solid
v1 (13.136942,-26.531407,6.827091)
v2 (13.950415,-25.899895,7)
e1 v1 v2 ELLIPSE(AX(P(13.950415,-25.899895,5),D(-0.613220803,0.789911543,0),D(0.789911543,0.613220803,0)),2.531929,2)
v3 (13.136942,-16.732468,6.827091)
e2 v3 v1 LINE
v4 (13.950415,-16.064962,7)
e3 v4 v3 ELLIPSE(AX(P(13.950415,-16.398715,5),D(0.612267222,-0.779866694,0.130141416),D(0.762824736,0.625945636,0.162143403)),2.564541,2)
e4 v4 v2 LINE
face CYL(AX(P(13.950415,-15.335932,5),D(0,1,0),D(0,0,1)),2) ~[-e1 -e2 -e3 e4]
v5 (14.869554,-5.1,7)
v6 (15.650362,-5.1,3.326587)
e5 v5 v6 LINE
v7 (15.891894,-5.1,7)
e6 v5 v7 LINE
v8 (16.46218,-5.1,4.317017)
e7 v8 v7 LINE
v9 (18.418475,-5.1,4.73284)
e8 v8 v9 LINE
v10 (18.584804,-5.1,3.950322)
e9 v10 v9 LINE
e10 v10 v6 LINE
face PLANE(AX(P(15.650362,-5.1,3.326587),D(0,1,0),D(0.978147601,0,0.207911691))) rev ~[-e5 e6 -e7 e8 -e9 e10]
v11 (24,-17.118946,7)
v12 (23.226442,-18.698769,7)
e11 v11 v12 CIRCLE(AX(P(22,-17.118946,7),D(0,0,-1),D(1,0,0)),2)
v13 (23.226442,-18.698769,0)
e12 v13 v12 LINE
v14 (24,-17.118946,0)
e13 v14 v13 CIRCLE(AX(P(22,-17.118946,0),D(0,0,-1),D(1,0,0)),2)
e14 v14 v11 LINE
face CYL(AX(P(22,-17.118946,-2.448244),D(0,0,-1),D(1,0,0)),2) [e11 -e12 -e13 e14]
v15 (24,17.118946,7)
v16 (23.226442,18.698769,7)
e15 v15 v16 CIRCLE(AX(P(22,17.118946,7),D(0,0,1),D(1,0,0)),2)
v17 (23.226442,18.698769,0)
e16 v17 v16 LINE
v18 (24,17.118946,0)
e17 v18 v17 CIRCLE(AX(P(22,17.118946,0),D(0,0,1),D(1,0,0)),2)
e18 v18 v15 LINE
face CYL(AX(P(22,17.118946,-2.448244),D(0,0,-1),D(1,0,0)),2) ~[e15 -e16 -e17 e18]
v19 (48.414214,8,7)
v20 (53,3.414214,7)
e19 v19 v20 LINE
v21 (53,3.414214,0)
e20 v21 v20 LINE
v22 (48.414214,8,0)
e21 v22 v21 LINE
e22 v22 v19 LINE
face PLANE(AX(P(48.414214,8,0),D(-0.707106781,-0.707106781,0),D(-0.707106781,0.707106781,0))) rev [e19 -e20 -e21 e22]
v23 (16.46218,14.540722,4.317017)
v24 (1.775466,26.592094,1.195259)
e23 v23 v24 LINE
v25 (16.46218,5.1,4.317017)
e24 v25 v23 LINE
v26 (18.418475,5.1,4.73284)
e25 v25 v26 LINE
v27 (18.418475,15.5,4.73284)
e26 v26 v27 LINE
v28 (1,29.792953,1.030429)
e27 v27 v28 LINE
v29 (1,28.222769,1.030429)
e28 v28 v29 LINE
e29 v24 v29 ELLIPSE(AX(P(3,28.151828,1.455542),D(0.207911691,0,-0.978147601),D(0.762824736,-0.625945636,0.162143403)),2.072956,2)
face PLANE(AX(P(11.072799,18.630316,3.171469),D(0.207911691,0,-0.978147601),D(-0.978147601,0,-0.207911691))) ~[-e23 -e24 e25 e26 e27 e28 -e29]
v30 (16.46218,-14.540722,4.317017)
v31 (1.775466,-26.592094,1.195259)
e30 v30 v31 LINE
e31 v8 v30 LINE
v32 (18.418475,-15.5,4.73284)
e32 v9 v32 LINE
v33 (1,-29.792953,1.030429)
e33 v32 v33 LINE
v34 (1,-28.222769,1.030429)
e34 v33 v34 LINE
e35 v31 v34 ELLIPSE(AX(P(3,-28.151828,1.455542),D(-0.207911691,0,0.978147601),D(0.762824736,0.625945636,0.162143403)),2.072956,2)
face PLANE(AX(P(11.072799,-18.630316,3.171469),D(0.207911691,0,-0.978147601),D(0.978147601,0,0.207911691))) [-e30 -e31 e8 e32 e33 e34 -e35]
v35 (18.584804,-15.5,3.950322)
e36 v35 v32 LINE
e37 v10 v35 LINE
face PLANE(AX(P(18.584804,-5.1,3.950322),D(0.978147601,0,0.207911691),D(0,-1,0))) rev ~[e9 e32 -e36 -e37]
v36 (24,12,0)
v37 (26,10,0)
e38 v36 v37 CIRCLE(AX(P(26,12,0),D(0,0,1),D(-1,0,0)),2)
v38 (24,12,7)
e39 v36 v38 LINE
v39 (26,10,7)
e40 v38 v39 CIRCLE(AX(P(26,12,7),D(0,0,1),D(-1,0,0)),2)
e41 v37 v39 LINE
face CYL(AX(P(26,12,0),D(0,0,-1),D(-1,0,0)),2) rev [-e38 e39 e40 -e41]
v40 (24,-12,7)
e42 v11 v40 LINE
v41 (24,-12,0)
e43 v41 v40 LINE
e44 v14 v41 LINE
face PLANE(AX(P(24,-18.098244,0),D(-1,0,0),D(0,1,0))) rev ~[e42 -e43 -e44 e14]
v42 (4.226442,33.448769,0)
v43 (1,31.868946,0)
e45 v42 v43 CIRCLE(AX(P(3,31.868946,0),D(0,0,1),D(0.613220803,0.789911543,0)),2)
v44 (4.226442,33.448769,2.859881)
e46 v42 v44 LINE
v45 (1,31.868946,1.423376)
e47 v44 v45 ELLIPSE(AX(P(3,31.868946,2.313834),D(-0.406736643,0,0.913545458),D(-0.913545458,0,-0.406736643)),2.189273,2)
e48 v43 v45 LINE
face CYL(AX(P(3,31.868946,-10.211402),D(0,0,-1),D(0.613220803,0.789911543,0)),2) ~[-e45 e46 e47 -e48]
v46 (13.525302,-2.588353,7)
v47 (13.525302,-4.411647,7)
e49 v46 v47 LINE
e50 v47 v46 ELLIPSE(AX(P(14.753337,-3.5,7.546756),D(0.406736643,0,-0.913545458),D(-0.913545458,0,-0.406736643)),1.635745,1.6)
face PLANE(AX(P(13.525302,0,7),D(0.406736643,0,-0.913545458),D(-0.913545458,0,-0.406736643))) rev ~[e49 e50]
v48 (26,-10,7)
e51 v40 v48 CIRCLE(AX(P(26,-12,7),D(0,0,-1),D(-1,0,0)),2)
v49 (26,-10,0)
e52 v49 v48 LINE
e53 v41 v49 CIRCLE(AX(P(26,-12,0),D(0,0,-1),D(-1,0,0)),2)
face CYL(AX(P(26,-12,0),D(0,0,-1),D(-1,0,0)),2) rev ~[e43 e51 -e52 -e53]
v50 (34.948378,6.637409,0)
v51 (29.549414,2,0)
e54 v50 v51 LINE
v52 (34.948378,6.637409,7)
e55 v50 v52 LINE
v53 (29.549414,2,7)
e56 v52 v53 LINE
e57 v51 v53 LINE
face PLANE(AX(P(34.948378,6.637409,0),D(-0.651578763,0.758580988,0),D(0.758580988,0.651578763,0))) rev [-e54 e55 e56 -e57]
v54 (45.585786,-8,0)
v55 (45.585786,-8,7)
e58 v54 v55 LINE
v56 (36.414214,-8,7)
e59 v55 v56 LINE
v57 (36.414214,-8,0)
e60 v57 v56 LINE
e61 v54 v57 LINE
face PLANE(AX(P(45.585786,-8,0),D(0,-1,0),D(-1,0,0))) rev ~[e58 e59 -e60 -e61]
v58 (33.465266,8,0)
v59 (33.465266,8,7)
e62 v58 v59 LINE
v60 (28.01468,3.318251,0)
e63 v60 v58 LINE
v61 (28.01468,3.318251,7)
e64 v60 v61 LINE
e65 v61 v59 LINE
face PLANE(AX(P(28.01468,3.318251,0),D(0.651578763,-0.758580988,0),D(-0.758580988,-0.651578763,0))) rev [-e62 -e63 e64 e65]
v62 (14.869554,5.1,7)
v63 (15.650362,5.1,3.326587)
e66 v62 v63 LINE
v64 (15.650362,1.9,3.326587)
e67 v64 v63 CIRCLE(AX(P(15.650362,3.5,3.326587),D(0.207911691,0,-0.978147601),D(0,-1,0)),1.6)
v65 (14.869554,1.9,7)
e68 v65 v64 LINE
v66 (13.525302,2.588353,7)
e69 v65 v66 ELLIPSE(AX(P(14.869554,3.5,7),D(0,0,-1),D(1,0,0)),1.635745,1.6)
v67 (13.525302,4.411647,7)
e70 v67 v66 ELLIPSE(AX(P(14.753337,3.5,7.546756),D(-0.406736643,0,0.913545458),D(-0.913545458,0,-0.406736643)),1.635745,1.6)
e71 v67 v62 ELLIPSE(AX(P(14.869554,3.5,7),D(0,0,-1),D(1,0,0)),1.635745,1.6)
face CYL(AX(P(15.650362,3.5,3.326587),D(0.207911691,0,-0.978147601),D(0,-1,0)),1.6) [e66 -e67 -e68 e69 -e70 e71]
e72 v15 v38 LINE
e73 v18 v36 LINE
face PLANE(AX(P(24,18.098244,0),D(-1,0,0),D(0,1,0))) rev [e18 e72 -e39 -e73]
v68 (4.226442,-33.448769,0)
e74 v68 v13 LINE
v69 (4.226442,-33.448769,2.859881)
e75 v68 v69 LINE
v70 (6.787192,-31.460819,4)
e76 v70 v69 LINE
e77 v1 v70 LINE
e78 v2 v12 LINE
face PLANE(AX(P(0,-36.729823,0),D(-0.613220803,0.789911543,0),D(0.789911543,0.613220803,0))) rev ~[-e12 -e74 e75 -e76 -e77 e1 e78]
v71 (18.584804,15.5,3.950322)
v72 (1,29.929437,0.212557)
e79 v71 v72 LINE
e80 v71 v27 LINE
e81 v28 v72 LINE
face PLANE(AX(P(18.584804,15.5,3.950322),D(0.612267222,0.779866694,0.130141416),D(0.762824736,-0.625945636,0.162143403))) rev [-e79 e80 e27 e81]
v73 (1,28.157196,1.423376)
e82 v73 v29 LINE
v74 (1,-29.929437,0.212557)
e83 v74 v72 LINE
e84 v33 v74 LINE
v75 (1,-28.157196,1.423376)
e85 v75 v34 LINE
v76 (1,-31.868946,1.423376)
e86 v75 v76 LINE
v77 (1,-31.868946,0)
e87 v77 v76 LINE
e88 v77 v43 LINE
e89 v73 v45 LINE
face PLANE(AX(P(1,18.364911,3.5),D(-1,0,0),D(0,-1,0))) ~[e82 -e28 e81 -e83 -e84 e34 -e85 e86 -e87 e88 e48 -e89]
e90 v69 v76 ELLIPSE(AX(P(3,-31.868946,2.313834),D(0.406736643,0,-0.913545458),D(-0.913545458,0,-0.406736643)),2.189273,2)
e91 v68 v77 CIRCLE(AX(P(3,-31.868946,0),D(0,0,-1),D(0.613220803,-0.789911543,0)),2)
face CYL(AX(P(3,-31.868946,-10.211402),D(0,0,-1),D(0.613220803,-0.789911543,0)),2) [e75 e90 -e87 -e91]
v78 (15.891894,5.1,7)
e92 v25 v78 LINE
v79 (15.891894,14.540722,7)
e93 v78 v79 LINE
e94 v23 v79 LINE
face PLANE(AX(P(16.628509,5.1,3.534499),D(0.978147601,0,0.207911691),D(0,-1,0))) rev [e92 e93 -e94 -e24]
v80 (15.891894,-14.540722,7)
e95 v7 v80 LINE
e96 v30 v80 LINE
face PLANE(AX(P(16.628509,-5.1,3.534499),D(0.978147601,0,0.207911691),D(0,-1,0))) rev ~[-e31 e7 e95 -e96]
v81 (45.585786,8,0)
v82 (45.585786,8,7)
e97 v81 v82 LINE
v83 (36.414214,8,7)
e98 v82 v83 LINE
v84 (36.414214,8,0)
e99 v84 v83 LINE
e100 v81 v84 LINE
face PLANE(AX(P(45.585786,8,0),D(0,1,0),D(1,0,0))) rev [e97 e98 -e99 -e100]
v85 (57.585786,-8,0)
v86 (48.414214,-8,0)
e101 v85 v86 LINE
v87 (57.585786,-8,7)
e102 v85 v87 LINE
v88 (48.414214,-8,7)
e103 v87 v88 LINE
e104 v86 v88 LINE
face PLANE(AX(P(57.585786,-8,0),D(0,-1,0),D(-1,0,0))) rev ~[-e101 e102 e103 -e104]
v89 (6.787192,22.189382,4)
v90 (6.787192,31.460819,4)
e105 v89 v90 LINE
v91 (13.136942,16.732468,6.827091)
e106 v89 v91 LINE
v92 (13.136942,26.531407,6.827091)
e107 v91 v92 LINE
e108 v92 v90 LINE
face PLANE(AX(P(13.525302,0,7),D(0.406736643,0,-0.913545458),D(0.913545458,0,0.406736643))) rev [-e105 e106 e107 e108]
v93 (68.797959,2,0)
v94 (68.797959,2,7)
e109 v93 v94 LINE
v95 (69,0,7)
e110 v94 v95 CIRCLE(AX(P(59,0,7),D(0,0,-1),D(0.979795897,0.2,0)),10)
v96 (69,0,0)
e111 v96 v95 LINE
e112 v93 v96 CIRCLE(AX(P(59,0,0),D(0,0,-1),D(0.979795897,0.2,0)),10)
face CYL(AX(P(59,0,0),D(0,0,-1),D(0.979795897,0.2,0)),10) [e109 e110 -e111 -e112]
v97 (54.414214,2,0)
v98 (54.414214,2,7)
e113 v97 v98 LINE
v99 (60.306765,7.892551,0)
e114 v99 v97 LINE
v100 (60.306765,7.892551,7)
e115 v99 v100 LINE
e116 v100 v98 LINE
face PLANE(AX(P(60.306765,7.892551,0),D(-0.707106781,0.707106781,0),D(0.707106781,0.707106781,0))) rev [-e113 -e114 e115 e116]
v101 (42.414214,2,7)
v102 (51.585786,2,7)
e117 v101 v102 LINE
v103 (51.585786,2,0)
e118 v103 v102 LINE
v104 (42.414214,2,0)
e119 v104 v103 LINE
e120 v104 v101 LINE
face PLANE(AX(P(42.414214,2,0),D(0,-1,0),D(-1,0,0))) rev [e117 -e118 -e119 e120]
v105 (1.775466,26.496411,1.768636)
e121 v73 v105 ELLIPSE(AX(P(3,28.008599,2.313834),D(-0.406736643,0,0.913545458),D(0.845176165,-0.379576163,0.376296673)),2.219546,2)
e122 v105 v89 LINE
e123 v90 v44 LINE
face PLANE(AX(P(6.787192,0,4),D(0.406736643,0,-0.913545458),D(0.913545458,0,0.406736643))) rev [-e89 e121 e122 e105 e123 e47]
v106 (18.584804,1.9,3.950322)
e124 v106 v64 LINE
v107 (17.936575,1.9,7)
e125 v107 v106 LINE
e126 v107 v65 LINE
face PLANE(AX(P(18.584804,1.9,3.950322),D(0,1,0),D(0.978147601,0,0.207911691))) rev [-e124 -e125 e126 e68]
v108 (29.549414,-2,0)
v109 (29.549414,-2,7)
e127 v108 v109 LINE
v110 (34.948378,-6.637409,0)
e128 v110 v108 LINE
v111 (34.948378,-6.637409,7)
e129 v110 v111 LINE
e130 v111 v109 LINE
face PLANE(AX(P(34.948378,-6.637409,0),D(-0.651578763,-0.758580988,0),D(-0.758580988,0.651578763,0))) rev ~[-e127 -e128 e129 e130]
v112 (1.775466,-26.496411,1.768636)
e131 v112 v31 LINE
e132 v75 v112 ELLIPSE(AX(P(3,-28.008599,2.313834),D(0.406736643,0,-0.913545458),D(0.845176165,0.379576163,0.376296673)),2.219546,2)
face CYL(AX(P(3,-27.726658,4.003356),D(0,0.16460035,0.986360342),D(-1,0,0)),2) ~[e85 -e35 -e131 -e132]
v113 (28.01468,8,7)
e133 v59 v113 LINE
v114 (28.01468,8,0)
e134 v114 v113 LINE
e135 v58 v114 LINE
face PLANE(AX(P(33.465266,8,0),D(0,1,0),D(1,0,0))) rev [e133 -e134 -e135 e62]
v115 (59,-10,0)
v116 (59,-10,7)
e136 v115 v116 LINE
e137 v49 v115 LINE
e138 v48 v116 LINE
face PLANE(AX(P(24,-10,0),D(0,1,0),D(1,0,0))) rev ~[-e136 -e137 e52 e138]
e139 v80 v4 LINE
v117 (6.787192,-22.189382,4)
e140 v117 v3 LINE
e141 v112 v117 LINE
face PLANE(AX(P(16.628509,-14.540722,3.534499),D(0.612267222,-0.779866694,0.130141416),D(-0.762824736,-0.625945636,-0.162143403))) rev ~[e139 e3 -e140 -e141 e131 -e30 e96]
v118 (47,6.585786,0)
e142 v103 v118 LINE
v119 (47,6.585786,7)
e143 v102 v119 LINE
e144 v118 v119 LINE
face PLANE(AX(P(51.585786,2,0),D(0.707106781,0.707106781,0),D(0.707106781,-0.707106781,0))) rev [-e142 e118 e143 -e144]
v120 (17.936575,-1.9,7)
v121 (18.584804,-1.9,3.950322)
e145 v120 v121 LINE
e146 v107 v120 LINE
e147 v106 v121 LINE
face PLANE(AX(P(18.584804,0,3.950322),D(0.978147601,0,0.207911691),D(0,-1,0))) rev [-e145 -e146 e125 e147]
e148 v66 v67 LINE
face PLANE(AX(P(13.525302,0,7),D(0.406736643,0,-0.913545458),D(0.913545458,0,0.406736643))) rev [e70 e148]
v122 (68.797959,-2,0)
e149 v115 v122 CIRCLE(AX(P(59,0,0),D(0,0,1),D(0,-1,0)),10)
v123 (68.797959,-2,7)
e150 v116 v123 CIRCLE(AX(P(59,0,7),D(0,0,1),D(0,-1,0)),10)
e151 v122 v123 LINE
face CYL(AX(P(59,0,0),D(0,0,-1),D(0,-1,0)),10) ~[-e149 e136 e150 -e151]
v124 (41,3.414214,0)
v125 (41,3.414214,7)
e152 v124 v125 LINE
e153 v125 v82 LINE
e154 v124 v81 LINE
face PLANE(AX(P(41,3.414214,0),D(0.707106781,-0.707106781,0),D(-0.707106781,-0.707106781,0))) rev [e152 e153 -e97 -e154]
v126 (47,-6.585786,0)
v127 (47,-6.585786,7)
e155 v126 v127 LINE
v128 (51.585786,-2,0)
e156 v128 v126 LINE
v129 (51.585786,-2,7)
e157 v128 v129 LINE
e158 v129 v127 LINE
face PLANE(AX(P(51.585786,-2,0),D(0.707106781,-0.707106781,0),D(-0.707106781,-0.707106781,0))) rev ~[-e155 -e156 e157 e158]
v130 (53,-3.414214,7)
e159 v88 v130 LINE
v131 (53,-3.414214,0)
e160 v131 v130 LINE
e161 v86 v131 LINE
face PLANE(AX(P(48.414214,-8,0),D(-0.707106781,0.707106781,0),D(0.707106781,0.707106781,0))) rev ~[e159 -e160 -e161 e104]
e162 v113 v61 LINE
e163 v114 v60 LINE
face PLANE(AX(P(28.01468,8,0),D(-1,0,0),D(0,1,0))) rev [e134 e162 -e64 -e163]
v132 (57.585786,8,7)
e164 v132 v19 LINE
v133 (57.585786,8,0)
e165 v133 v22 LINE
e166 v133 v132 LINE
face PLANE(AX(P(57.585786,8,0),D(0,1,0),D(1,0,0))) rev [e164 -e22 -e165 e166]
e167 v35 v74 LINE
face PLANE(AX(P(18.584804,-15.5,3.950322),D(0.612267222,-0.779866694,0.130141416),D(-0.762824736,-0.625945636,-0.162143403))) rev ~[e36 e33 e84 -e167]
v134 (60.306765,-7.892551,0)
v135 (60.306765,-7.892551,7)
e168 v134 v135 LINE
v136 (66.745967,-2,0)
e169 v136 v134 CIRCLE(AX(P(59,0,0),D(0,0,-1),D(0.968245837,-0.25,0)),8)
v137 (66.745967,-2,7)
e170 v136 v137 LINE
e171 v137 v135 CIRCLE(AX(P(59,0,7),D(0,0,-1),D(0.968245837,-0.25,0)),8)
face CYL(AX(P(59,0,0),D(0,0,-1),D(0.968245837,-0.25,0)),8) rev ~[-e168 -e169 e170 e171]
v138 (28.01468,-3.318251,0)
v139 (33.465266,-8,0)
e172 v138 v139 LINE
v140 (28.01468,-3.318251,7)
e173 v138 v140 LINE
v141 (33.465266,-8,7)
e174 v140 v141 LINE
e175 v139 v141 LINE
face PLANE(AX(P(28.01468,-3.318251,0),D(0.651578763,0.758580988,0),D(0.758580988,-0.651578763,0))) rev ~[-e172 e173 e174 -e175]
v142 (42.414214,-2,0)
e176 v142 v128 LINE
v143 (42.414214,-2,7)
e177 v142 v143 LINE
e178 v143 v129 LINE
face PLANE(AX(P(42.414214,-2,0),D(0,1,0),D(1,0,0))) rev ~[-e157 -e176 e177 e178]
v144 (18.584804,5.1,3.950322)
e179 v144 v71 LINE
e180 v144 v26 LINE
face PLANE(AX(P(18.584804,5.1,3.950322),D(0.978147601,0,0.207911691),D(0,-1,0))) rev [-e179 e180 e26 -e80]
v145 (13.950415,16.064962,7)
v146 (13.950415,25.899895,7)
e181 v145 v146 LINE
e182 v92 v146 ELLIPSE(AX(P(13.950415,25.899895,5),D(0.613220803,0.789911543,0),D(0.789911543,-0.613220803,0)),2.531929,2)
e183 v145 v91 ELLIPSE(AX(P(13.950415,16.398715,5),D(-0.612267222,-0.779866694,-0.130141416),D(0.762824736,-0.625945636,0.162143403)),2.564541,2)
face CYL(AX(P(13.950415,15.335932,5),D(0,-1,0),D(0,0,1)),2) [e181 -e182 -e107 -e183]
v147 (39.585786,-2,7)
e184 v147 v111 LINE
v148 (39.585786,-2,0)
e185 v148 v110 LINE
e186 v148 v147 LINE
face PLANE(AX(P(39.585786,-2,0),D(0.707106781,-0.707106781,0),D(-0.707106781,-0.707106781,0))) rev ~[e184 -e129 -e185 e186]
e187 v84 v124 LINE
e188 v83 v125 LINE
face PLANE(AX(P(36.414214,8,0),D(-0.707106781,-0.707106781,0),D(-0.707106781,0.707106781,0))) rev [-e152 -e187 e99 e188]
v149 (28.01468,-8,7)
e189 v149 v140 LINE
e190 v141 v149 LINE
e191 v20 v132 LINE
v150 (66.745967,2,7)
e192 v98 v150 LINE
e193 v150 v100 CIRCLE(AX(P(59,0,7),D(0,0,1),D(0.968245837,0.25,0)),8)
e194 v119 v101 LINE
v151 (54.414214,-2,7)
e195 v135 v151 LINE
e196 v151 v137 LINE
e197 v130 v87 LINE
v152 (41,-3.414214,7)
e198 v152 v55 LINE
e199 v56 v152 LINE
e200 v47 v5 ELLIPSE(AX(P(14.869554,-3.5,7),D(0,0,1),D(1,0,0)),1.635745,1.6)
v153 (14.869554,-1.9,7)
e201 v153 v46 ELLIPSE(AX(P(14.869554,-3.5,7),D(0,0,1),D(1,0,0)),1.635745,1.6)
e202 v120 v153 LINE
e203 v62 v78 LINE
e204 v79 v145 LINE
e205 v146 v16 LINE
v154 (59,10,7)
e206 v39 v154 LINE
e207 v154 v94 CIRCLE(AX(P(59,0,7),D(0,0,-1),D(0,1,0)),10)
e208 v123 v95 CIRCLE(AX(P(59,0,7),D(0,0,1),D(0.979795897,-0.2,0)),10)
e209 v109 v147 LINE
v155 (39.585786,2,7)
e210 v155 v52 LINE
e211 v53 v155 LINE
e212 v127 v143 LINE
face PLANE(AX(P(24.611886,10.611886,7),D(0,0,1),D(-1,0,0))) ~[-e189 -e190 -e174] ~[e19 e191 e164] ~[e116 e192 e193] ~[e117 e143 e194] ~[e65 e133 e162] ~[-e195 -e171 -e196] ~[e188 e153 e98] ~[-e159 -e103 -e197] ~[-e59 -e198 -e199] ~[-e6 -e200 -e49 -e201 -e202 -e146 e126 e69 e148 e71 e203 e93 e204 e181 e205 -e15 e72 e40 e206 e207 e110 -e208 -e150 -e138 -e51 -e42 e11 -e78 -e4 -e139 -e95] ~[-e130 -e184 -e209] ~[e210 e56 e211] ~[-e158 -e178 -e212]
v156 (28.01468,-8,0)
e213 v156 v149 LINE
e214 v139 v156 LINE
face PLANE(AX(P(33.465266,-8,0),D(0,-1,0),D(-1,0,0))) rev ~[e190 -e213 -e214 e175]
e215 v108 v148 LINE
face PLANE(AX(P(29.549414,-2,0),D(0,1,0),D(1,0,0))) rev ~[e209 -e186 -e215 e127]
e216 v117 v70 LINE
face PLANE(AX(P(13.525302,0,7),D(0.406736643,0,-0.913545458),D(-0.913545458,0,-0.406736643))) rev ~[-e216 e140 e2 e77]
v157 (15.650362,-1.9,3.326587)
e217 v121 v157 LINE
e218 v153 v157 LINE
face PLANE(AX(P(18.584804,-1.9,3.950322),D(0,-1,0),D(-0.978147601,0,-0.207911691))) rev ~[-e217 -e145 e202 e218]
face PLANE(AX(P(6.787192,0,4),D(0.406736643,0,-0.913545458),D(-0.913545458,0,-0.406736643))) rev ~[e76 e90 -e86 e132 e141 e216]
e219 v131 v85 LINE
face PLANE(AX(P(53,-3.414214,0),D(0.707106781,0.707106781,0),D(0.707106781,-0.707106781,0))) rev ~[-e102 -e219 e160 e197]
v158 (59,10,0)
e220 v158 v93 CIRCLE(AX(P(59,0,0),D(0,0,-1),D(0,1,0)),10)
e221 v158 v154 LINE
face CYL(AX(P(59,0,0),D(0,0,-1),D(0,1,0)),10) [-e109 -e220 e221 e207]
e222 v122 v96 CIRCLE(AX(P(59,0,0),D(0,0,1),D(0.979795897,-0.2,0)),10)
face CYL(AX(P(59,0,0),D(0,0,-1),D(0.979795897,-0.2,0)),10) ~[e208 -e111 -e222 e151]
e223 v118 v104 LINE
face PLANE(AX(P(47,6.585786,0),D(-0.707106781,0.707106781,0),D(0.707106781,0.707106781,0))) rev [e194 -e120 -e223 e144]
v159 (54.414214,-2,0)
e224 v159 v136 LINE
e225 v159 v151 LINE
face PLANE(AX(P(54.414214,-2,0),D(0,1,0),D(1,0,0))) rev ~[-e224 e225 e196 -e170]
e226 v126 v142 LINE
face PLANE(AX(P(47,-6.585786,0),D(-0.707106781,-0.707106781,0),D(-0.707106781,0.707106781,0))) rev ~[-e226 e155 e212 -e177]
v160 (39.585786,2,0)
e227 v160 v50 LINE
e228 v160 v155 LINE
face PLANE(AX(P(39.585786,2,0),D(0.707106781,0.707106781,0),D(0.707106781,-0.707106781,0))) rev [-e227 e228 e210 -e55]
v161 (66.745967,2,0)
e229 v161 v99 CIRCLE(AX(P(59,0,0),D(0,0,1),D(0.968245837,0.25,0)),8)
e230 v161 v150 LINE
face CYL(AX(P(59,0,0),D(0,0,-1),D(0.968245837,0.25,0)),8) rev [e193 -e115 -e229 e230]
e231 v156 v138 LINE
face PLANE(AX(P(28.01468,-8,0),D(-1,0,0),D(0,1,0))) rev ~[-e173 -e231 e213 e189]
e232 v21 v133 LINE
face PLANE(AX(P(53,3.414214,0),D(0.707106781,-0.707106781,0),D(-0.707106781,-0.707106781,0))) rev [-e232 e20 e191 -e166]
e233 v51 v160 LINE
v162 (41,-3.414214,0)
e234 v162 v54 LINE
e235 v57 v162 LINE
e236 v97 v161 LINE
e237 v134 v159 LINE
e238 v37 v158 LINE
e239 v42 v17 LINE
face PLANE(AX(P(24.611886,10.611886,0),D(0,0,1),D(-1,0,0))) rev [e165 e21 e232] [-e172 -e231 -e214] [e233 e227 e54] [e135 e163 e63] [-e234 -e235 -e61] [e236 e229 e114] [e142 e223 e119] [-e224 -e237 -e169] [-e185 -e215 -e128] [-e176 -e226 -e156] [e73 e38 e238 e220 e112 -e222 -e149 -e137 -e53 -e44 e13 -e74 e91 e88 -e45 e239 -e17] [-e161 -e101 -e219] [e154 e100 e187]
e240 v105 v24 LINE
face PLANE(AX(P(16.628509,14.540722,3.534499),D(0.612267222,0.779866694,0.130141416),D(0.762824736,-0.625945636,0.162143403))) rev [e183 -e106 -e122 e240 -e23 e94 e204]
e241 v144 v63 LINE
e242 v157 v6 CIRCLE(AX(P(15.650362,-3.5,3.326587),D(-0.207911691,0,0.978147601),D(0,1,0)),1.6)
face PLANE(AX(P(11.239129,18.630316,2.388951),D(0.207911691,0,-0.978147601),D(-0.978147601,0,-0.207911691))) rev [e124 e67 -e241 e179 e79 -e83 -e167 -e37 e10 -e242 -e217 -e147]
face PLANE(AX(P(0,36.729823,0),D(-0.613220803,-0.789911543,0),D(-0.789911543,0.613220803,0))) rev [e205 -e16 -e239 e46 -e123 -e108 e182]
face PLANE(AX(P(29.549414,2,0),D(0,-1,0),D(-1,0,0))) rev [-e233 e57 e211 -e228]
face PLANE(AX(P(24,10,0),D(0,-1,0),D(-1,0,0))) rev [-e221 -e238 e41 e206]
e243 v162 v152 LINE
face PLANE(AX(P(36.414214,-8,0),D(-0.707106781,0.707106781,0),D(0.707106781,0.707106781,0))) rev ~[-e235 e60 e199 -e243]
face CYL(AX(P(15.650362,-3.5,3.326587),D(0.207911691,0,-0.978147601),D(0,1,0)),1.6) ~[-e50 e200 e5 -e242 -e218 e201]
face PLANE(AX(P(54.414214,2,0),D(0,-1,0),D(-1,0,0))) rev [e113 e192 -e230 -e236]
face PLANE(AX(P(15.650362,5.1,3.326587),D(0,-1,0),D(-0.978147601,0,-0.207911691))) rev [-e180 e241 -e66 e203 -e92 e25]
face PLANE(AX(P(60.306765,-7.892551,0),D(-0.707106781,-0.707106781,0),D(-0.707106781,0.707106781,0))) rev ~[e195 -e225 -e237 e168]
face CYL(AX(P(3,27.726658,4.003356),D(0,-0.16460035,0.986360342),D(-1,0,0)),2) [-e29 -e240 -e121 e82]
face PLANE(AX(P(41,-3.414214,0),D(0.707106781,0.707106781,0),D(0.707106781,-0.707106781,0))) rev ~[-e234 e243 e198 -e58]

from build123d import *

# Parameters (mm, degrees)
F1_DEPTH      = 7
F5_DEPTH      = 0.8
F6_REACH      = 40.8395042988
F7_W          = 36.7298226772
F7_H          = 7
F8_DEPTH      = 1
F9_DEPTH      = 45
F10_T1_DEPTH  = 7
F10_T3_DEPTH  = 21.8461795352
F10_T5_DEPTH  = 11.8964874596
F10_T7_DEPTH  = 11.956767541
F10_T12_DEPTH = 5.3023503656


# Not quite as in the source:
# - a fillet or chamfer that OpenCascade refuses, or shapes differently, is made with other operations: its cross-section is extruded or revolved along the edge and cut away or added


with BuildPart() as f1:
    # F0 (on Top) → F1 (new body)
    with BuildSketch(Plane.XY):
        with BuildLine():
            Line((0, 0), (0, -36.7298226772))
            Line((0, -36.7298226772), (24, -18.0982437298))
            Line((24, -18.0982437298), (24, -10))
            Line((24, -10), (59, -10))
            ThreePointArc((59, -10), (65.3245553203, -7.7459666924), (68.7979589711, -2))
            ThreePointArc((68.7979589711, -2), (68.9493615301, -1.0050896201), (69, 0))
            Line((69, 0), (0, 0))
        make_face()
        Polygon((33.4652661258, -8), (28.0146803707, -8), (28.0146803707, -3.3182508079), align=None, mode=Mode.SUBTRACT)
        Polygon((41, -3.4142135624), (45.5857864376, -8), (36.4142135624, -8), align=None, mode=Mode.SUBTRACT)
        Polygon((29.5494142449, -2), (39.5857864376, -2), (34.9483778196, -6.637408618), align=None, mode=Mode.SUBTRACT)
        Polygon((42.4142135624, -2), (51.5857864376, -2), (47, -6.5857864376), align=None, mode=Mode.SUBTRACT)
        Polygon((53, -3.4142135624), (57.5857864376, -8), (48.4142135624, -8), align=None, mode=Mode.SUBTRACT)
        with BuildLine():
            ThreePointArc((66.7459666924, -2), (64.4007894962, -5.9018194498), (60.3067648391, -7.8925512767))
            Line((60.3067648391, -7.8925512767), (54.4142135624, -2))
            Line((54.4142135624, -2), (66.7459666924, -2))
        make_face(mode=Mode.SUBTRACT)
    extrude(amount=F1_DEPTH)

    # F4 (on face) → F5 (cut)
    with BuildSketch(Plane(origin=(0, 0, 0), x_dir=(0.9781476007, 0, 0.2079116908), z_dir=(0.2079116908, 0, -0.9781476007))):
        Polygon((19, 15.5), (0, 30.75), (0, 28.1854591432), (17, 14.5407223011), (17, 5.1), (19, 5.1), align=None)
        with BuildLine():
            Line((17, 14.5407223011), (0, 28.1854591432))
            Line((0, 28.1854591432), (0, 0))
            Line((0, 0), (19, 0))
            Line((19, 0), (19, 1.9))
            Line((19, 1.9), (16, 1.9))
            ThreePointArc((16, 1.9), (14.4, 3.5), (16, 5.1))
            Line((16, 5.1), (17, 5.1))
            Line((17, 5.1), (17, 14.5407223011))
        make_face()
    extrude(amount=-F5_DEPTH, mode=Mode.SUBTRACT)

    f6_end = Plane(origin=(20.8323918984, -11.3984937311, 7), x_dir=(1, 0, 0), z_dir=(0, 0, 1))
    # F4 (on face) → F6 (cut, up to a plane its end follows)
    with BuildSketch(Plane(origin=(0, 0, 0), x_dir=(0.9781476007, 0, 0.2079116908), z_dir=(0.2079116908, 0, -0.9781476007))):
        with BuildLine():
            Line((17, 14.5407223011), (0, 28.1854591432))
            Line((0, 28.1854591432), (0, 0))
            Line((0, 0), (19, 0))
            Line((19, 0), (19, 1.9))
            Line((19, 1.9), (16, 1.9))
            ThreePointArc((16, 1.9), (14.4, 3.5), (16, 5.1))
            Line((16, 5.1), (17, 5.1))
            Line((17, 5.1), (17, 14.5407223011))
        make_face()
    f6_long = extrude(amount=-F6_REACH, mode=Mode.PRIVATE)
    add(split(f6_long, bisect_by=f6_end, keep=Keep.BOTTOM, mode=Mode.PRIVATE), mode=Mode.SUBTRACT)

    # F7 (on face) → F8 (cut)
    with BuildSketch(Plane(origin=(0, 0, 0), x_dir=(0, -1, 0), z_dir=(-1, 0, 0))):
        with Locations((18.3649113386, 3.5)):
            Rectangle(F7_W, F7_H)
    extrude(amount=-F8_DEPTH, mode=Mode.SUBTRACT)

    # F2 (on face) → F9 (cut)
    with BuildSketch(Plane(origin=(0, 0, 0), x_dir=(-1, 0, 0), z_dir=(0, 1, 0))):
        Polygon((0, 4), (-6.7871916141, 4), (0, 0.9781476007), align=None)
        Polygon((-13.5253019358, 7), (-6.7871916141, 4), (0, 4), (0, 7), align=None)
    extrude(amount=-F9_DEPTH, mode=Mode.SUBTRACT)

    # F10: fillet of radius 2 on 5 edges, made by hand

    # F10_s2 → F10_t1 (join)
    with BuildSketch(Plane.XY):
        with BuildLine():
            ThreePointArc((24, -12), (24.5857864376, -10.5857864376), (26, -10))
            Line((26, -10), (24, -10))
            Line((24, -10), (24, -12))
        make_face()
    extrude(amount=F10_T1_DEPTH)

    # F10_s4 → F10_t3 (cut)
    with BuildSketch(Plane.XY.offset(-10.2114016246)):
        with BuildLine():
            ThreePointArc((4.2264416068, -33.4487693246), (2.1204783157, -33.6651760692), (1, -31.8689462379))
            Line((1, -31.8689462379), (1, -35.9535068877))
            Line((1, -35.9535068877), (4.2264416068, -33.4487693246))
        make_face()
    extrude(amount=F10_T3_DEPTH, mode=Mode.SUBTRACT)

    # F10_s6 → F10_t5 (cut)
    with BuildSketch(Plane.XY.offset(-2.4482437298)):
        with BuildLine():
            ThreePointArc((24, -17.1189462379), (23.7962298313, -17.9984679222), (23.2264416068, -18.6987693246))
            Line((23.2264416068, -18.6987693246), (24, -18.0982437298))
            Line((24, -18.0982437298), (24, -17.1189462379))
        make_face()
    extrude(amount=F10_T5_DEPTH, mode=Mode.SUBTRACT)

    # F10_s8 → F10_t7 (cut)
    with BuildSketch(Plane.XZ.offset(15.3359324944)):
        with BuildLine():
            ThreePointArc((13.9504150591, 7), (13.5345916775, 6.9562952015), (13.136941773, 6.8270909153))
            Line((13.136941773, 6.8270909153), (13.5253019358, 7))
            Line((13.5253019358, 7), (13.9504150591, 7))
        make_face()
    extrude(amount=F10_T7_DEPTH, mode=Mode.SUBTRACT)


with BuildPart() as f10_tool10:
    # F10_s11 → F10_t12 (new body)
    with BuildSketch(Plane(origin=(0, -0.1012401159, -0.6066769302), x_dir=(1, 0, 0), z_dir=(0, -0.1646003505, -0.9863603422))):
        with BuildLine():
            ThreePointArc((1, 28.0074292273), (1.2043011265, 27.126824006), (1.7754655557, 26.4261274235))
            Line((1.7754655557, 26.4261274235), (1, 27.0266353601))
            Line((1, 27.0266353601), (1, 28.0074292273))
        make_face()
    extrude(amount=F10_T12_DEPTH)

    split(bisect_by=Plane(origin=(-0.1663293527, 0, 0.7825180806), x_dir=(0, 1, 0), z_dir=(-0.2079116908, 0, 0.9781476007)), keep=Keep.TOP)


with BuildPart() as f1_1:
    add(f1.part)

    # F10_t9: cut F10_tool10
    add(f10_tool10.part, mode=Mode.SUBTRACT)

    # F11: F1 across plane


with BuildPart() as f1_2:
    add(f1_1.part)
    add(f1_1.part.mirror(Plane.XZ))


solid = f1_2.part
